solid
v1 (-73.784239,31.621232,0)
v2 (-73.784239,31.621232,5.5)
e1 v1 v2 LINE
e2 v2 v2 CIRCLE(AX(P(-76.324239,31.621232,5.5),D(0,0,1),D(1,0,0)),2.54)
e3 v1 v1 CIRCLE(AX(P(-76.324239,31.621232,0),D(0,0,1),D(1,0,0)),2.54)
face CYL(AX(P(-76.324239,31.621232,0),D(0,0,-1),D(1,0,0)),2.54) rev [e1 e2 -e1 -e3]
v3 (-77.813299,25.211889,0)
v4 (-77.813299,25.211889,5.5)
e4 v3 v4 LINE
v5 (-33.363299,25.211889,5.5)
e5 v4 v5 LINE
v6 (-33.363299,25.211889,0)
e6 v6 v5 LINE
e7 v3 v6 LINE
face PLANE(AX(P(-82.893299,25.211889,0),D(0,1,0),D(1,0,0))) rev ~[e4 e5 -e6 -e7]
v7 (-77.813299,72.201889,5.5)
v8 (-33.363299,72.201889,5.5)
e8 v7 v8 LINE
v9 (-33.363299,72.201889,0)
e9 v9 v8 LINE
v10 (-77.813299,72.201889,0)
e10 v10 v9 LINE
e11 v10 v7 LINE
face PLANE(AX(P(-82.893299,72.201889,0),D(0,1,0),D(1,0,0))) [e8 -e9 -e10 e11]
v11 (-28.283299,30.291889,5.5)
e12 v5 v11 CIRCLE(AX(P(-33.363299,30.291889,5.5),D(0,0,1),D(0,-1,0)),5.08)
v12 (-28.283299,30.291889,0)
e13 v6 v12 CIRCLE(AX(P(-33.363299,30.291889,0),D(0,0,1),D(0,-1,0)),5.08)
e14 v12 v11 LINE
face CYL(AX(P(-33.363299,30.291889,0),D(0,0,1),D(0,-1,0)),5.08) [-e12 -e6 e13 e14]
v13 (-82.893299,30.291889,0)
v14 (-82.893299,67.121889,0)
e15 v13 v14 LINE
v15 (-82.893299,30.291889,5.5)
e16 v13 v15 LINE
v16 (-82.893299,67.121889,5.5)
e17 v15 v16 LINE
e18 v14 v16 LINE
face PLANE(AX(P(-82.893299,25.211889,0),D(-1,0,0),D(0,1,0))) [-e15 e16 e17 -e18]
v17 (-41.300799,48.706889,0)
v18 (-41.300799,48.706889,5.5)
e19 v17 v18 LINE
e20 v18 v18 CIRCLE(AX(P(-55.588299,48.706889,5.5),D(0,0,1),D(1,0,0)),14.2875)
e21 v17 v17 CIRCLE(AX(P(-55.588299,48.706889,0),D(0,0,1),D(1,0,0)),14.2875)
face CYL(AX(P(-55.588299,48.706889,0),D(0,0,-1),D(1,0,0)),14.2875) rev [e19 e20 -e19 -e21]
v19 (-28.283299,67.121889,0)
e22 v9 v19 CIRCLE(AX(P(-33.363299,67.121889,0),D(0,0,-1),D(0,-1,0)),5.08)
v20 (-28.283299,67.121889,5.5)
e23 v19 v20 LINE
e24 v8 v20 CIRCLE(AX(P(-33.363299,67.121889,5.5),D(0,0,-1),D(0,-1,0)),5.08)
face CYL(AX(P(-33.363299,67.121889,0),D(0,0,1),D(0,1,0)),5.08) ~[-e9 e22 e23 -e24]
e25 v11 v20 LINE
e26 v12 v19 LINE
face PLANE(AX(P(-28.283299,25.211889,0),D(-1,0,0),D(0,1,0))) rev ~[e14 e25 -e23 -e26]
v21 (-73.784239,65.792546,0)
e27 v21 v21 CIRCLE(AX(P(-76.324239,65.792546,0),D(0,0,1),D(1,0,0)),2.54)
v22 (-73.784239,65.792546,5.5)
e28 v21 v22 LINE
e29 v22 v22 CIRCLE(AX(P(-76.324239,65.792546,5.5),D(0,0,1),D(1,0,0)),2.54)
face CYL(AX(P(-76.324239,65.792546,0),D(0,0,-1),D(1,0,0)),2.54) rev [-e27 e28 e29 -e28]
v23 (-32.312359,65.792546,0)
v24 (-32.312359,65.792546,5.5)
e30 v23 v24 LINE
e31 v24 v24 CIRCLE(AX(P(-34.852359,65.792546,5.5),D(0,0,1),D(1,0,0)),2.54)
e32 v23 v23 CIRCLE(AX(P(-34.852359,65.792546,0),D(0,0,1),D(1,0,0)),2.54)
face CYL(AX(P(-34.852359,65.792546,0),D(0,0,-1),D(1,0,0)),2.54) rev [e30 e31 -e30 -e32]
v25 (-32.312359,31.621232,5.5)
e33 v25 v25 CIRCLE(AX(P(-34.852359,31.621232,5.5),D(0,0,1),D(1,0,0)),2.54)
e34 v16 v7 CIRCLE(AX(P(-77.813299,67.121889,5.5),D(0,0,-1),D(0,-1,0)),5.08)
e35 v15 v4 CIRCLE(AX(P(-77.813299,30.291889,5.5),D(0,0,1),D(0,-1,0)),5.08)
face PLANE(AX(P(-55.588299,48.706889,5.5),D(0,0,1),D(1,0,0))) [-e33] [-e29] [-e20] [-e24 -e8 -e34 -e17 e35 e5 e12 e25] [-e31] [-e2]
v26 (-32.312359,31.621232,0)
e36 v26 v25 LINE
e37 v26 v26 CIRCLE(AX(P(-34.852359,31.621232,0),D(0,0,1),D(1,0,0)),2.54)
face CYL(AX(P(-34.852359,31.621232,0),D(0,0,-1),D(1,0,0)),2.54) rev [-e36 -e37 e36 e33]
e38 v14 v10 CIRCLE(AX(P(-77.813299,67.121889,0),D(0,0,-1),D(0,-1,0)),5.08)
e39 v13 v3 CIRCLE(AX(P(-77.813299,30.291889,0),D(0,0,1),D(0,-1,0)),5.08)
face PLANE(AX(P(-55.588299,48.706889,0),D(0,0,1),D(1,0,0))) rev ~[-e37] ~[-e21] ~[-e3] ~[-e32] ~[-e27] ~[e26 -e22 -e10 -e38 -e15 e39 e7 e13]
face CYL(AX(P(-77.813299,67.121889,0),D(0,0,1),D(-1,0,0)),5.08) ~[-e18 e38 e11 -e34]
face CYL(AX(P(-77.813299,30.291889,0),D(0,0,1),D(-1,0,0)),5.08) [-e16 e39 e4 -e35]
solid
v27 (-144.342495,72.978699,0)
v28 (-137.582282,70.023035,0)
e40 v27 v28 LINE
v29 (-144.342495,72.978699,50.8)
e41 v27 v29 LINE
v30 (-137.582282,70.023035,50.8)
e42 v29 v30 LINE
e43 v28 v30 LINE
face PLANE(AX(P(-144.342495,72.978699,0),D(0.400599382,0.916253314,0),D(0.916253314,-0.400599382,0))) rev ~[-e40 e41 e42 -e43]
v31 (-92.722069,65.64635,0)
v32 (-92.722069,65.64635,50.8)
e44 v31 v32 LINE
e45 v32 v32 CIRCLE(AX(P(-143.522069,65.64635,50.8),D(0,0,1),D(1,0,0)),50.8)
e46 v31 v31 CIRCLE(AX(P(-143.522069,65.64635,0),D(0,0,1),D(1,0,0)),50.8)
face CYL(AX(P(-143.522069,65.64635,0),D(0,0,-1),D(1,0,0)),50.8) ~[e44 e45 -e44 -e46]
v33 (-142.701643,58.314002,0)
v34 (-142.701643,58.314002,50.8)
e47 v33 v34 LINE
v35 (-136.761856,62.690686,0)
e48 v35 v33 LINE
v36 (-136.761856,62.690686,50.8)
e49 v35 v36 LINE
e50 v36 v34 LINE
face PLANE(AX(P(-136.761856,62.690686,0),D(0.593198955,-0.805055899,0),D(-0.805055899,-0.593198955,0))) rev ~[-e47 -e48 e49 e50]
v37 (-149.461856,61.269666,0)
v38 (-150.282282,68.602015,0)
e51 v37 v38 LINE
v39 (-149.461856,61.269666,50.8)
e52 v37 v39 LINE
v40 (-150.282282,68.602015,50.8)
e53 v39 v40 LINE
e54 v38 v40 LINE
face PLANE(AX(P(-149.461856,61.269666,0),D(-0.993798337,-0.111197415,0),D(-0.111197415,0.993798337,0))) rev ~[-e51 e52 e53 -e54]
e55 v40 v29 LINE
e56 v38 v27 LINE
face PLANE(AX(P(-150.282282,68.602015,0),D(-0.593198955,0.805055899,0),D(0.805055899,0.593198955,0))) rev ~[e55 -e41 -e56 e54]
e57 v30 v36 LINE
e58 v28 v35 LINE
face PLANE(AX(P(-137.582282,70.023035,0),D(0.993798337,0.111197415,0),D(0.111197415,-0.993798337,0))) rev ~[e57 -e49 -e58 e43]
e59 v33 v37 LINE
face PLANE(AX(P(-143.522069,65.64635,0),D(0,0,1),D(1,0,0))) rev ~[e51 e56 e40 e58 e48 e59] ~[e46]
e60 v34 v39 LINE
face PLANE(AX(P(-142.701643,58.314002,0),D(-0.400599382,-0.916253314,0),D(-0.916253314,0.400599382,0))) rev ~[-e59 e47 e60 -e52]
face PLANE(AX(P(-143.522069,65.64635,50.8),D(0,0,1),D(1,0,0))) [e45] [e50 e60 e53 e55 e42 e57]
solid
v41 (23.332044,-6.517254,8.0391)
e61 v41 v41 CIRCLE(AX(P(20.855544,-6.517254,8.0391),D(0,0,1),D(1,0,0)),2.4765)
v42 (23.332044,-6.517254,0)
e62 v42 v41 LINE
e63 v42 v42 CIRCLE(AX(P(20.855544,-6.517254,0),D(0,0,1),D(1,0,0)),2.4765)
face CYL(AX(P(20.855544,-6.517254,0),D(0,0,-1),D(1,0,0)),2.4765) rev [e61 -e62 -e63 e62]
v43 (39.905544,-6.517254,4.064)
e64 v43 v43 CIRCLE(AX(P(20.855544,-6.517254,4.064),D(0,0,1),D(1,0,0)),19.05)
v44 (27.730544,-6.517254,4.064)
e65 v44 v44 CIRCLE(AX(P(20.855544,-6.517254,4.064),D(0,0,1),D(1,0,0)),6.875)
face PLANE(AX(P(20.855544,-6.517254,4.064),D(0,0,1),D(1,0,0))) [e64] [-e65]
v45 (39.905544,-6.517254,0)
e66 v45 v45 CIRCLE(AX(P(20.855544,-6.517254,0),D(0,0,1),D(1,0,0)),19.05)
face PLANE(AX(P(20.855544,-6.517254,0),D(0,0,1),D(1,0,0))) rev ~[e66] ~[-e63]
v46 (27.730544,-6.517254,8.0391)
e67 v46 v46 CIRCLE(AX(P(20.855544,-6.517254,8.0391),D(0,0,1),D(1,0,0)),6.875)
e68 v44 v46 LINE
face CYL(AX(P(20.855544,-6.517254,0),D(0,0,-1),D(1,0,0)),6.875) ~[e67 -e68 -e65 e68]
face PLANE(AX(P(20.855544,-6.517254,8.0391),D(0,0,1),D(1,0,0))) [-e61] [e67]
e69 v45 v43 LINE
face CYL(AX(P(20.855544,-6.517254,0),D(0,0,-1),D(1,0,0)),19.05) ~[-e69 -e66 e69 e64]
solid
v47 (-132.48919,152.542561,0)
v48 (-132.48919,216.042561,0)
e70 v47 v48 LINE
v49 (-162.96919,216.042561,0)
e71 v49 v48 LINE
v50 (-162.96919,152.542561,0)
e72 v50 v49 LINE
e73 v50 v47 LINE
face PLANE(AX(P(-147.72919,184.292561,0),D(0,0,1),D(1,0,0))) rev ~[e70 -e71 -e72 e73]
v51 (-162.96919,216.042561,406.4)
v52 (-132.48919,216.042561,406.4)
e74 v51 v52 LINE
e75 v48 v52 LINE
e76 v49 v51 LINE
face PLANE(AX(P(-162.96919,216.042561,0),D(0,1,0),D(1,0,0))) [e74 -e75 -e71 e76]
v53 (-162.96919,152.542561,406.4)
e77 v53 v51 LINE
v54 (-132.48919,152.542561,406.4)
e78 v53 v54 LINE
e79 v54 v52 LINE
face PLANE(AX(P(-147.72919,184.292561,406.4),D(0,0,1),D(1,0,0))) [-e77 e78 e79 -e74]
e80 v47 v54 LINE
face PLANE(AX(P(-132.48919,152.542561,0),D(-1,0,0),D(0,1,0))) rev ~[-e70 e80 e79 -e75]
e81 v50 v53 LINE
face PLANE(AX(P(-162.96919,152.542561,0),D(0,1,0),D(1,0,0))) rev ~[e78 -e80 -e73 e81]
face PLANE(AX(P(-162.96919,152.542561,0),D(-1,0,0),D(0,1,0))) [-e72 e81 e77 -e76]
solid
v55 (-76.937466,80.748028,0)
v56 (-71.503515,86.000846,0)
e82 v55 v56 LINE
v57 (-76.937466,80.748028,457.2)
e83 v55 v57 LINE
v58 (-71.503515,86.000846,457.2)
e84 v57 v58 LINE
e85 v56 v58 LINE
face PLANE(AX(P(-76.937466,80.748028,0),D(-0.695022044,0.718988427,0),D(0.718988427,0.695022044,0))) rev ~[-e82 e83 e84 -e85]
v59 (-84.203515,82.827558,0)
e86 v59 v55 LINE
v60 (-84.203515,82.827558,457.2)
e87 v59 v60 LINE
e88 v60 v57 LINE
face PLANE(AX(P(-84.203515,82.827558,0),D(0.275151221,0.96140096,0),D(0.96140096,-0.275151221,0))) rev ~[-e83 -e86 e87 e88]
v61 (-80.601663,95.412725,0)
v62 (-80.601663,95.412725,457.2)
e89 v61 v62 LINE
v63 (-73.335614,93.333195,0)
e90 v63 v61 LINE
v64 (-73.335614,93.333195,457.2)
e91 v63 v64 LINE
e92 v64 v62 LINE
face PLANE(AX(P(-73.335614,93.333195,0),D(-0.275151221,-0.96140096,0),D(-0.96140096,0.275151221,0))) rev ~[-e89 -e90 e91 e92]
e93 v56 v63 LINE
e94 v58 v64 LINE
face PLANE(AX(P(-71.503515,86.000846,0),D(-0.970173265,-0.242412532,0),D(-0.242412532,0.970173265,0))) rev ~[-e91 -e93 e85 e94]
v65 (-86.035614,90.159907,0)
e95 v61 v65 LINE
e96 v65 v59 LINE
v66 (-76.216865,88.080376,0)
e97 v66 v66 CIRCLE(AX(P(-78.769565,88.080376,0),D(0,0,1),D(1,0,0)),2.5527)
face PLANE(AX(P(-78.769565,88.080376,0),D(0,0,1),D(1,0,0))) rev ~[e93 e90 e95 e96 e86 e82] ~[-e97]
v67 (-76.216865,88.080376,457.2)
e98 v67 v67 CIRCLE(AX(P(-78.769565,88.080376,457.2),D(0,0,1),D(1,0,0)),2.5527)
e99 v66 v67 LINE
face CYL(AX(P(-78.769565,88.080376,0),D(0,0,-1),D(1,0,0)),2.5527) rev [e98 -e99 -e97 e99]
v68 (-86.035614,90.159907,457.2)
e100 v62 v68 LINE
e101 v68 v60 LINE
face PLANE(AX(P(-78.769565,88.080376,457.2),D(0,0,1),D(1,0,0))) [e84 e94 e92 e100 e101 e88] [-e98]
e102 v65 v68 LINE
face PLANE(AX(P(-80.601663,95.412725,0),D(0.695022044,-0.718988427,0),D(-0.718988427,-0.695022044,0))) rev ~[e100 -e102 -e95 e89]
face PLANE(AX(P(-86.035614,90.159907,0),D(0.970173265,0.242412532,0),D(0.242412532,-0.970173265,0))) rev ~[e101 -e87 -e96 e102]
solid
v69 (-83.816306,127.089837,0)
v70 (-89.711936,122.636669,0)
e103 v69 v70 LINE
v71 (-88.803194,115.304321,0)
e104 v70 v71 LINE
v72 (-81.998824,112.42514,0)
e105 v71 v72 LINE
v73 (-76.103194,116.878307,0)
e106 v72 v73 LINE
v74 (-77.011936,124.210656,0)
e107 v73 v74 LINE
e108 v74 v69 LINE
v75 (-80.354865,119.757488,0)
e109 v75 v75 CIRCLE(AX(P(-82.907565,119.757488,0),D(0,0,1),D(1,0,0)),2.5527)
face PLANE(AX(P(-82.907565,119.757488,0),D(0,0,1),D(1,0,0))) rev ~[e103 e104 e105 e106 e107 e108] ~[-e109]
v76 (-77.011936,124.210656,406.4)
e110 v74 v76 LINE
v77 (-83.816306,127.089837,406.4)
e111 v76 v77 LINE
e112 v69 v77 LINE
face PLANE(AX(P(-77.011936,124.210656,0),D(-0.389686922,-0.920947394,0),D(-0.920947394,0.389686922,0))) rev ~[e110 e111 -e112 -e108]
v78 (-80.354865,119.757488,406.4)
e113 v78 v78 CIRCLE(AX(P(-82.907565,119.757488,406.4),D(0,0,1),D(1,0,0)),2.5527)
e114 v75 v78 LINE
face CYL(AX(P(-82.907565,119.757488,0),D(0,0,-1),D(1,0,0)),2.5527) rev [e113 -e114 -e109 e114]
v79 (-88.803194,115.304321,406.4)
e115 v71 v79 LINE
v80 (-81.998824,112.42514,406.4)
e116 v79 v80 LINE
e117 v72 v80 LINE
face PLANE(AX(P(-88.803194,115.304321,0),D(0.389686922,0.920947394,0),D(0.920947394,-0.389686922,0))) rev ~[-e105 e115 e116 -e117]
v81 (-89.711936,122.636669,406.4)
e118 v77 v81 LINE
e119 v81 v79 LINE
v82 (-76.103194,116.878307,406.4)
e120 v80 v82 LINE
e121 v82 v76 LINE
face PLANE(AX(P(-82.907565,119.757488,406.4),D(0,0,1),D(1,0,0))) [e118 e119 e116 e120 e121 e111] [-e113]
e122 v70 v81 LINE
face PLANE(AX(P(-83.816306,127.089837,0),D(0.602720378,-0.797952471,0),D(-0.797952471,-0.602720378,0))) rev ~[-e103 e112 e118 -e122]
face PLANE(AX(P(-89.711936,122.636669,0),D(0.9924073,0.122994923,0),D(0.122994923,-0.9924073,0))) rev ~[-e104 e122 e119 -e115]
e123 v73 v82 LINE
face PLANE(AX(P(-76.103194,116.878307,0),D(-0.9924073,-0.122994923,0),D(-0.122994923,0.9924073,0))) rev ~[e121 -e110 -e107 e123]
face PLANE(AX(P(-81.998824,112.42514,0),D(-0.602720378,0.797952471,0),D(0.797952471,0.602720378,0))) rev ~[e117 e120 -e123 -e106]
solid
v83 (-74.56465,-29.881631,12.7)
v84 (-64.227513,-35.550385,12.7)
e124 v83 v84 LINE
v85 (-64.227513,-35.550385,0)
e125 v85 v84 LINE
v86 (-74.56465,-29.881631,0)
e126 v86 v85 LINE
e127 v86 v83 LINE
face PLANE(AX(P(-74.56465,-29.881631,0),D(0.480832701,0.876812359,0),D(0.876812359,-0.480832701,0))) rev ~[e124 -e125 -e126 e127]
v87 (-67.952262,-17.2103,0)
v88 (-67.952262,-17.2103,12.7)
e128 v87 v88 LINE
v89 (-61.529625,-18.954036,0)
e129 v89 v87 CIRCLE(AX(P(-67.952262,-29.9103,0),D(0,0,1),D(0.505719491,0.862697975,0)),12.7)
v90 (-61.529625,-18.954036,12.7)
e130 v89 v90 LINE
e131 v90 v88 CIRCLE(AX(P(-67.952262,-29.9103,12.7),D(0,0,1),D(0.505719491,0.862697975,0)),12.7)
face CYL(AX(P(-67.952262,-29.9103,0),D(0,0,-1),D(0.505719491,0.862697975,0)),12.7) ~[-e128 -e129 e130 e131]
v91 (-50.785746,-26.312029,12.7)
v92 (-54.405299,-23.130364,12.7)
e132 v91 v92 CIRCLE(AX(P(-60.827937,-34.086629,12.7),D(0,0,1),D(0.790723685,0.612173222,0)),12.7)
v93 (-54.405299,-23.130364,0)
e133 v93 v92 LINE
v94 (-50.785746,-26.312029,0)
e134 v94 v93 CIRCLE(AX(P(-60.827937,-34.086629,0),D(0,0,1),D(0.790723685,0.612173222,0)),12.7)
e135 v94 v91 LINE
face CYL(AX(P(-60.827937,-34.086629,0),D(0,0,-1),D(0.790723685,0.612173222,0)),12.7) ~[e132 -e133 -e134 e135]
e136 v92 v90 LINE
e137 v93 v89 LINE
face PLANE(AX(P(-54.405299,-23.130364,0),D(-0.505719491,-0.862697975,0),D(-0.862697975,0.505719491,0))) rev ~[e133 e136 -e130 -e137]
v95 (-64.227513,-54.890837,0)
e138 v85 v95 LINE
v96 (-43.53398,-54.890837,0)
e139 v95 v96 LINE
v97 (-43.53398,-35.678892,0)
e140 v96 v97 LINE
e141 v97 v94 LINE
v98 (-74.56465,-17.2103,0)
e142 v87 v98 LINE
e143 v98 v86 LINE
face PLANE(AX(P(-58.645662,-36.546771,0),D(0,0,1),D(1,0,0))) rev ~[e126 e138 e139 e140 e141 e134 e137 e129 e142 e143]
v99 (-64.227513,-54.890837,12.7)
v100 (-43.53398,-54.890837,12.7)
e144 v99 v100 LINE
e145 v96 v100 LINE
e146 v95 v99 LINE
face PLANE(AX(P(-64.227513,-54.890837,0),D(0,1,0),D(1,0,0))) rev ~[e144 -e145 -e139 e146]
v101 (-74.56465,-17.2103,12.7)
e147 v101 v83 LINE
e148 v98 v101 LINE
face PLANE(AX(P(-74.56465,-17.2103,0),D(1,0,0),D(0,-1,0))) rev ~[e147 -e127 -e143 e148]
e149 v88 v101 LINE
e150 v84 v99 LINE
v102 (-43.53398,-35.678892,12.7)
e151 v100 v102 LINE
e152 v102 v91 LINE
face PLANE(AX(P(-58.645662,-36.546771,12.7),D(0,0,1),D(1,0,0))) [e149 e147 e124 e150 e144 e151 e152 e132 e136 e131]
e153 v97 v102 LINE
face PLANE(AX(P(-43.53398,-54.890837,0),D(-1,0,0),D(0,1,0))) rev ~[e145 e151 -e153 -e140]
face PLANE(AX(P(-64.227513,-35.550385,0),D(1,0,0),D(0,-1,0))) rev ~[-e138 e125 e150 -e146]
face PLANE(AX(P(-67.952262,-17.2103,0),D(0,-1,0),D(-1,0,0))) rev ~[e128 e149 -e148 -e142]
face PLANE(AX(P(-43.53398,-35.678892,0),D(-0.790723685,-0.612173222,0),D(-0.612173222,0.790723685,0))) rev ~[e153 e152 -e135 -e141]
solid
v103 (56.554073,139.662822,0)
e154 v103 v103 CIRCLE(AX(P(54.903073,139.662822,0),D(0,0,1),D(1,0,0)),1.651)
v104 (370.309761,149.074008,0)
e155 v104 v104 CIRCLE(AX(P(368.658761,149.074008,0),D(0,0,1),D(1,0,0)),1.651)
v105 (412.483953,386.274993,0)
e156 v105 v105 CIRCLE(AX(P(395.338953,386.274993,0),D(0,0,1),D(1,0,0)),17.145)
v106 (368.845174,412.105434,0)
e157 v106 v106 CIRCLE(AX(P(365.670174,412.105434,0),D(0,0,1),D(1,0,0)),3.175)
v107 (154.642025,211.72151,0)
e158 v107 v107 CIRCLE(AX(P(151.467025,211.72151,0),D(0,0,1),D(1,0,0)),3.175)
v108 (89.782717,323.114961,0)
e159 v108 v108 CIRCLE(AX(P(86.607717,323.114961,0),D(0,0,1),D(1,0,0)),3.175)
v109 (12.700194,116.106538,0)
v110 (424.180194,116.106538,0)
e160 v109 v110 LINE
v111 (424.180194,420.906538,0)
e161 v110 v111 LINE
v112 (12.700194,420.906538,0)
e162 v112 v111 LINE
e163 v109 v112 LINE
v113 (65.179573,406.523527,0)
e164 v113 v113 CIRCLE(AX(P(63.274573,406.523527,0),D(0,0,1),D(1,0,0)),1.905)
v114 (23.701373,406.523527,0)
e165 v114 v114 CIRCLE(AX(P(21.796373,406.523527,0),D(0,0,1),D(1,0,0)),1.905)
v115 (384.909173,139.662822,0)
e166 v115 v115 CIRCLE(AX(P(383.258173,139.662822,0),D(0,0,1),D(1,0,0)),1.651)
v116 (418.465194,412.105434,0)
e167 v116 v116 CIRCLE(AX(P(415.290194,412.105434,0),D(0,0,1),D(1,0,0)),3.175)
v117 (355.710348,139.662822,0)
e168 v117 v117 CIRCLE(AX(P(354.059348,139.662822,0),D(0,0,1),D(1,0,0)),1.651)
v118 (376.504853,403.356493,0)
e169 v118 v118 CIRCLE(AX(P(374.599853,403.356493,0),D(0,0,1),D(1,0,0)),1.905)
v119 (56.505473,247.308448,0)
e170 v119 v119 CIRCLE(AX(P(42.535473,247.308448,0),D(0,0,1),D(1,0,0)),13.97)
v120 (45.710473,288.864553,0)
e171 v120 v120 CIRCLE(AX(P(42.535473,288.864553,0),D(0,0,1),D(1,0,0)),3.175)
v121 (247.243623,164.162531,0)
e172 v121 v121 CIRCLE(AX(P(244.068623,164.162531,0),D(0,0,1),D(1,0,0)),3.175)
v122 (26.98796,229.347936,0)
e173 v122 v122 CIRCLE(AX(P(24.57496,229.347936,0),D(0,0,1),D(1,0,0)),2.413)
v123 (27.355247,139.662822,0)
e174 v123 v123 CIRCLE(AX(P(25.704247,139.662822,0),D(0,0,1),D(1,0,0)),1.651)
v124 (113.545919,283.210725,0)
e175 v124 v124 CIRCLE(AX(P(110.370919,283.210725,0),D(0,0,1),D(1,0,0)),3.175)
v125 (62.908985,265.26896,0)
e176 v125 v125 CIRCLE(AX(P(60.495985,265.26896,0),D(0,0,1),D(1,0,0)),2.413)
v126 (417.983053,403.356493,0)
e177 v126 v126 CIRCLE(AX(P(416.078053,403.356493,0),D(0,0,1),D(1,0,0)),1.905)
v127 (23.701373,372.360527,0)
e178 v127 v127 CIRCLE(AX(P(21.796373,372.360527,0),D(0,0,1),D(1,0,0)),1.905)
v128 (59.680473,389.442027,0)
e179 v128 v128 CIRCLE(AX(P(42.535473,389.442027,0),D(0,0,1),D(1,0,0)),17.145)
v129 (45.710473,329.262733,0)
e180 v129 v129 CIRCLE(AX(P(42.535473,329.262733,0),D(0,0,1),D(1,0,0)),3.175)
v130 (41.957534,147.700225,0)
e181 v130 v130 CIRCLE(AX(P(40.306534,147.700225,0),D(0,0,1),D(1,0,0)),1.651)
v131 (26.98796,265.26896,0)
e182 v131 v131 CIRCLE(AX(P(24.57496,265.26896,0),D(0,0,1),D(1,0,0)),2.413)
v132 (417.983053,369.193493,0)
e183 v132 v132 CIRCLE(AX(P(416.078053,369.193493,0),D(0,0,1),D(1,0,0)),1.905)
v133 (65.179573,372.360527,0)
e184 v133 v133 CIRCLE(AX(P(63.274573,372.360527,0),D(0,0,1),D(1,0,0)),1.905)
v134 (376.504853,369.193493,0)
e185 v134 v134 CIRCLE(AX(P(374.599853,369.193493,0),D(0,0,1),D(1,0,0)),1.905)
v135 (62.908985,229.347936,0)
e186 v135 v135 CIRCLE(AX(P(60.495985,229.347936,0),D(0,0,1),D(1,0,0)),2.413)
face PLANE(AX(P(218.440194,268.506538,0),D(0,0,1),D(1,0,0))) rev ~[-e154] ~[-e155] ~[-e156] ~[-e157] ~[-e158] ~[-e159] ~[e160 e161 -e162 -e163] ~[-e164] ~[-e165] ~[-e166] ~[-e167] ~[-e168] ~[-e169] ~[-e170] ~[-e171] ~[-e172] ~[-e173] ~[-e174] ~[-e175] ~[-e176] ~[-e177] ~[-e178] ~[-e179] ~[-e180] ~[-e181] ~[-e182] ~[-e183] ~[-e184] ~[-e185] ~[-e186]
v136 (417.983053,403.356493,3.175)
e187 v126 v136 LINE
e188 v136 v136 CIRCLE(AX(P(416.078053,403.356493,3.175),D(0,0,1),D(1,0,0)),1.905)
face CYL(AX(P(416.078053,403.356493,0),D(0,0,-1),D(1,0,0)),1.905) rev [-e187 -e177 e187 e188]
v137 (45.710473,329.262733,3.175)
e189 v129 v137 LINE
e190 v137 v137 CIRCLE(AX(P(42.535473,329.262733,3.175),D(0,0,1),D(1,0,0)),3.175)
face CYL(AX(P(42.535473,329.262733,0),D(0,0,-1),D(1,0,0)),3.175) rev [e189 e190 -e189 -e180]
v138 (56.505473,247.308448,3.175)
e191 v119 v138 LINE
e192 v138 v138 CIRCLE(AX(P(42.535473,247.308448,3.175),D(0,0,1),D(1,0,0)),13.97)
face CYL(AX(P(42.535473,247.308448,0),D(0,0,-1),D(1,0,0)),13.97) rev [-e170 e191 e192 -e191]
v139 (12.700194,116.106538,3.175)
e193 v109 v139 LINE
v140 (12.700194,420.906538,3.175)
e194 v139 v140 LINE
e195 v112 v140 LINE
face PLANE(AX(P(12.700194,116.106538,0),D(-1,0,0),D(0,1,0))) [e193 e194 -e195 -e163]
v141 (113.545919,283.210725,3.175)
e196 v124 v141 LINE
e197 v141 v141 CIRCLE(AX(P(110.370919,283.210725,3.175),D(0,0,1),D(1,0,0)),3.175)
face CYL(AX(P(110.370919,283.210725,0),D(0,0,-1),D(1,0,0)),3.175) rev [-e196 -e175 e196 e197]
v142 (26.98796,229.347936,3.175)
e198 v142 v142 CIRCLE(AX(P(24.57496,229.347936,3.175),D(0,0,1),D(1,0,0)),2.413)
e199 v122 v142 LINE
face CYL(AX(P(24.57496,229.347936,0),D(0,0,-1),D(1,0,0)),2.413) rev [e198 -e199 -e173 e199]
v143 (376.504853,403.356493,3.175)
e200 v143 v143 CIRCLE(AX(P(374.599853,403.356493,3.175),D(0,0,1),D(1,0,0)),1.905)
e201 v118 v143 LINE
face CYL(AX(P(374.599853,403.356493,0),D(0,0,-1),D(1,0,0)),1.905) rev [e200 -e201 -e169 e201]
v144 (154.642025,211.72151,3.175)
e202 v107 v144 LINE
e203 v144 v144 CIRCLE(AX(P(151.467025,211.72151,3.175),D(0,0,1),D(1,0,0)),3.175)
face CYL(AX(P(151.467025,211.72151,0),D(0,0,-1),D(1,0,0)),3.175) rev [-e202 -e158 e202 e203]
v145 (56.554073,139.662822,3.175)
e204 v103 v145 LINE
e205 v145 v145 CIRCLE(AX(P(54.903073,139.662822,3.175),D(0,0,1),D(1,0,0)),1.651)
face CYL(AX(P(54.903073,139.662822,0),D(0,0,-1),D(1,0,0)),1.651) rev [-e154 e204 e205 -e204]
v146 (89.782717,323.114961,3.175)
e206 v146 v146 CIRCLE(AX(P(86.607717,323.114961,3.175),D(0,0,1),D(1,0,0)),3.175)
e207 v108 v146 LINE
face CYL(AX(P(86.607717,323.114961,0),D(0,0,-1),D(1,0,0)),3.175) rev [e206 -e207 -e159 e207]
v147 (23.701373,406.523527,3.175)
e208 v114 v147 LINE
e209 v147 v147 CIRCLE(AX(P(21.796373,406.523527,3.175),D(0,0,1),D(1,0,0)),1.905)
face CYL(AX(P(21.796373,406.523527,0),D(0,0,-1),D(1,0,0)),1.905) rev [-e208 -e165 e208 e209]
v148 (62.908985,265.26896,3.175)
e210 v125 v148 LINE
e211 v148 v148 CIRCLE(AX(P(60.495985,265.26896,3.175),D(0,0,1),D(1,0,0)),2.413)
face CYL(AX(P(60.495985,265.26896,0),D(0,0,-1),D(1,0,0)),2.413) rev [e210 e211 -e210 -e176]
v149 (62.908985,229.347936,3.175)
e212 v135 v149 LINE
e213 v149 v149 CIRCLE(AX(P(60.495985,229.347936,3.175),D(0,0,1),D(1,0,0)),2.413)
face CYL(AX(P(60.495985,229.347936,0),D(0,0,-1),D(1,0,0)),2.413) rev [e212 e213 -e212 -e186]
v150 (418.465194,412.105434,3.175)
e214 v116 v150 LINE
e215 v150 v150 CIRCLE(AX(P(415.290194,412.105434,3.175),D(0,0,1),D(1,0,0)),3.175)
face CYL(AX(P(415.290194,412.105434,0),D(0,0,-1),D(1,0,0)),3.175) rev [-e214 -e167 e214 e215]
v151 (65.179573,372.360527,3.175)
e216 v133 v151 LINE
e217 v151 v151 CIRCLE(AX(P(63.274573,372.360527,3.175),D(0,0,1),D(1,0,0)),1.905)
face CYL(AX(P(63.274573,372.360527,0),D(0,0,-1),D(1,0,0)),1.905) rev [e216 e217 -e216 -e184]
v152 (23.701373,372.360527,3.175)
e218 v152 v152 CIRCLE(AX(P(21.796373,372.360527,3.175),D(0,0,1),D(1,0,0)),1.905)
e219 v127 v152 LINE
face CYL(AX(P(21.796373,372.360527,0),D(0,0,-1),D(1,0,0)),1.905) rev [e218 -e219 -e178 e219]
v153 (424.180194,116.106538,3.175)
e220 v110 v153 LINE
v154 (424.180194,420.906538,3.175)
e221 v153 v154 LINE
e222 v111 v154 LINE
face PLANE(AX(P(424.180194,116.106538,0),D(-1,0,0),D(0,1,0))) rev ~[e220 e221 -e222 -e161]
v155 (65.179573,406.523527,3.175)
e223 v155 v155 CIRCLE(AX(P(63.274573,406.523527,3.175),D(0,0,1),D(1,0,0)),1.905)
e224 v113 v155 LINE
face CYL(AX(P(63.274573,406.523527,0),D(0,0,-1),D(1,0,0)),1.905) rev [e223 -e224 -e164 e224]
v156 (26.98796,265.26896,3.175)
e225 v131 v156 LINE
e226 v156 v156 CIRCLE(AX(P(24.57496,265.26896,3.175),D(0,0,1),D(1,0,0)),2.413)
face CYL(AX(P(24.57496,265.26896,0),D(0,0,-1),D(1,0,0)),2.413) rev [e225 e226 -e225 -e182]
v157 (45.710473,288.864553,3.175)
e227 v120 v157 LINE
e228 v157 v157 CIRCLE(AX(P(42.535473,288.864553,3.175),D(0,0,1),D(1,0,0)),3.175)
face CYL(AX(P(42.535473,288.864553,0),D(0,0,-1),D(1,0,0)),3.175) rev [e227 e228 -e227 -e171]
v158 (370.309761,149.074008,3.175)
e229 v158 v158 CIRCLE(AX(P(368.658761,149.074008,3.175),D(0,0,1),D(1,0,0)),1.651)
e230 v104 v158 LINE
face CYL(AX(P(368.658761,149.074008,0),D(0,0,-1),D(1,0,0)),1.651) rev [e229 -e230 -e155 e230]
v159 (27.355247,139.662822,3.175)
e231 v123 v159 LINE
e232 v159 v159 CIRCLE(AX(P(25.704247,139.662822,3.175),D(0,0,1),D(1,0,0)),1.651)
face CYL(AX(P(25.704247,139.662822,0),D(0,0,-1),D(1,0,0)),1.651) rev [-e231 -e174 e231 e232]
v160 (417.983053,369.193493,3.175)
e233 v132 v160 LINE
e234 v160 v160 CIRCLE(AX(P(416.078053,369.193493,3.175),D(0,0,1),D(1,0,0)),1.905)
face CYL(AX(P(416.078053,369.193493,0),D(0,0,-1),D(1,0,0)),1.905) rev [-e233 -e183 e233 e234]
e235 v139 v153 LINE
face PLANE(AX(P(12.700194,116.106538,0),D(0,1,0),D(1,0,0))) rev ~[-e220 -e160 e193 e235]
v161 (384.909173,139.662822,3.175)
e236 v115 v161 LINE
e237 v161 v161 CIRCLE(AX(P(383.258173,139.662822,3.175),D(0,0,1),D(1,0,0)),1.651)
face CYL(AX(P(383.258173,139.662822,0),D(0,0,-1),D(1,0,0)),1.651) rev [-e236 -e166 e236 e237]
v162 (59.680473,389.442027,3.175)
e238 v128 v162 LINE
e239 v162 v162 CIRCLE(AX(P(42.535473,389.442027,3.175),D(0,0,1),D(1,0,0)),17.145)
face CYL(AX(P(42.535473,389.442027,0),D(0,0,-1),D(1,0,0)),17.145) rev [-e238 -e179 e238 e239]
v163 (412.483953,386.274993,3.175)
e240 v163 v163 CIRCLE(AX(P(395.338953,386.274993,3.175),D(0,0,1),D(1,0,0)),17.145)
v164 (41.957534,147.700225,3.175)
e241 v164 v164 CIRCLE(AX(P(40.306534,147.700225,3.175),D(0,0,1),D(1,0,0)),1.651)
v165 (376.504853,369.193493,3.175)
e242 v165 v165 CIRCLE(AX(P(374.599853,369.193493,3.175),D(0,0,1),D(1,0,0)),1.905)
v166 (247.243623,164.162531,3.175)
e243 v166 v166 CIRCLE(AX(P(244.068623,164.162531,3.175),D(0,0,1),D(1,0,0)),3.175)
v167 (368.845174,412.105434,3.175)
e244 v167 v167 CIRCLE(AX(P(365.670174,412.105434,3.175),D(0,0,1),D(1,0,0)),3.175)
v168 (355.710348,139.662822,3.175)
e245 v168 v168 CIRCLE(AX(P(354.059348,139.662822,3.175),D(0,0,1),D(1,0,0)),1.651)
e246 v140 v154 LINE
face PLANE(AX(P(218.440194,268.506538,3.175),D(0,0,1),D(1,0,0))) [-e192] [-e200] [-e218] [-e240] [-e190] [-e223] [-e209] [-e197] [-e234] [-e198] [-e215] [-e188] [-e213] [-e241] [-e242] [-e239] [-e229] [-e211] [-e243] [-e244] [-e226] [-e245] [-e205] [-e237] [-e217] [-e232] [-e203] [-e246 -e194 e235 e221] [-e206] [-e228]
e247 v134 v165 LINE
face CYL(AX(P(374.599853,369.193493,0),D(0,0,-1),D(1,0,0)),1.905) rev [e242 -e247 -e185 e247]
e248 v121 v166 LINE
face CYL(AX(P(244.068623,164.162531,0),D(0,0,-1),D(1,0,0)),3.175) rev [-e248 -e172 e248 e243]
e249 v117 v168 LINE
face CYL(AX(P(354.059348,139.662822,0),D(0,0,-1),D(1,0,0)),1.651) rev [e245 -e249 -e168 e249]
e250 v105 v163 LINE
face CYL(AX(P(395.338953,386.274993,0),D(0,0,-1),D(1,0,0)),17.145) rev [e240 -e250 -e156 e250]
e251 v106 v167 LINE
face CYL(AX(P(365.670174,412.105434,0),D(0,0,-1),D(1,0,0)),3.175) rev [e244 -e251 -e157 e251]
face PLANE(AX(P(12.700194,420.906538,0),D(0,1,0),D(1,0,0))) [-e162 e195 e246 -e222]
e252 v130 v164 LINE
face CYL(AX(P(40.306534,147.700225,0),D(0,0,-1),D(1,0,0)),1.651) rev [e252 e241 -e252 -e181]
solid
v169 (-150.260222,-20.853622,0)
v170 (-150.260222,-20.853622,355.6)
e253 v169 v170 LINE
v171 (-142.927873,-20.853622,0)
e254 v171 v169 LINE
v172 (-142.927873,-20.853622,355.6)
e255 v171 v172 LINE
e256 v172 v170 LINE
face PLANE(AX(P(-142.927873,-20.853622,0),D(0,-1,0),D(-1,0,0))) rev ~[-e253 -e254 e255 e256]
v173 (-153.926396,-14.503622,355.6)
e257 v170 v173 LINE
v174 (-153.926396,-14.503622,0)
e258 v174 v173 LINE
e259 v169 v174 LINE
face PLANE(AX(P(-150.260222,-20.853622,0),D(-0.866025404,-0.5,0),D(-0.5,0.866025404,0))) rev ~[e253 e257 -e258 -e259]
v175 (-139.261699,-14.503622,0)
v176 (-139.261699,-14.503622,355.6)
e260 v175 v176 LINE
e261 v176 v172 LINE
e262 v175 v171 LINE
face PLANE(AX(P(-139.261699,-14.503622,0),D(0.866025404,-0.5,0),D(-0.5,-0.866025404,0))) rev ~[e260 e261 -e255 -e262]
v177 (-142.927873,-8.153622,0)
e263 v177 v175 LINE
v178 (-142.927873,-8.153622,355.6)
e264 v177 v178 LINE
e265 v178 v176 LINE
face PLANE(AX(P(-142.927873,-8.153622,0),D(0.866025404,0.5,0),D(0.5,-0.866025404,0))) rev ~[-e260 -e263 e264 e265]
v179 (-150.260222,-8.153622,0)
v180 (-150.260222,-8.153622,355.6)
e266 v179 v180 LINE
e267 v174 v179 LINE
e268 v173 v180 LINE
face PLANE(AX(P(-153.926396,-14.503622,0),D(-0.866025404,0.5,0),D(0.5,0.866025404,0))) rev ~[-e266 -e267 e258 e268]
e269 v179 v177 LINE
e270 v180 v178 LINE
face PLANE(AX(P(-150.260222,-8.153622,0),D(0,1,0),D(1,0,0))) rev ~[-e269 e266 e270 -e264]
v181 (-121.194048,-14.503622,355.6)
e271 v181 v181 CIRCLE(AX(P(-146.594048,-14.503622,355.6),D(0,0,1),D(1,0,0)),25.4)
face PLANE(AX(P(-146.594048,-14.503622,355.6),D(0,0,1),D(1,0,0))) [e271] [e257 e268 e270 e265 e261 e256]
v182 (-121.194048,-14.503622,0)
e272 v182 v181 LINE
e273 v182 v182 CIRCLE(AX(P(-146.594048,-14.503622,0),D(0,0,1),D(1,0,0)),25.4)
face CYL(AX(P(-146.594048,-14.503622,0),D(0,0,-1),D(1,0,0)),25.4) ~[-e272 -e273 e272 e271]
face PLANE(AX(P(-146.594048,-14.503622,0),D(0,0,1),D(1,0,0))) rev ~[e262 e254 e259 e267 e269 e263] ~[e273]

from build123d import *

# Parameters (mm, degrees)
F1_R      = 50.8
F2_DEPTH  = 50.8
F1_R_2    = 2.5527
F3_DEPTH  = 457.2
F4_DEPTH  = 406.4
F5_W      = 30.48
F5_H      = 63.5
F6_DEPTH  = 406.4
F5_W_2    = 411.48
F5_H_2    = 304.8
F5_R      = 1.651
F5_R_2    = 2.413
F5_R_3    = 13.97
F5_R_4    = 3.175
F5_R_5    = 1.905
F5_R_6    = 17.145
F7_DEPTH  = 3.175
F8_W      = 54.61
F8_H      = 46.99
F8_R      = 2.54
F8_R_2    = 14.2875
F9_DEPTH  = 5.5
F10_R     = 5.08
F1_R_3    = 25.4
F11_DEPTH = 355.6
F13_DEPTH = 12.7
F14_R     = 19.05
F14_R_2   = 6.875
F15_DEPTH = 4.064
F14_R_3   = 2.4765
F16_DEPTH = 8.0391


# Not quite as in the source:
# - a length typed as a fraction of an inch, garbled in the dataset ("3 / 203.2 mm" for 3/8 in), is restored


with BuildPart() as f2:
    # F1 (on Top) → F2 (new body)
    with BuildSketch(Plane.XY):
        with Locations((-143.5220688581, 65.6463503838)):
            Circle(F1_R)
        Polygon((-137.5822819568, 70.0230345219), (-136.7618557595, 62.6906861032), (-142.7016426608, 58.3140019651), (-149.4618557595, 61.2696662456), (-150.2822819568, 68.6020146643), (-144.3424950555, 72.9786988025), align=None, mode=Mode.SUBTRACT)
    extrude(amount=F2_DEPTH)


with BuildPart() as f3:
    # F1 (on Top) → F3 (new body)
    with BuildSketch(Plane.XY):
        Polygon((-76.9374659596, 80.7480279679), (-71.5035152941, 86.0008461668), (-73.3356139631, 93.3331945856), (-80.6016632976, 95.4127248054), (-86.0356139631, 90.1599066064), (-84.2035152941, 82.8275581877), align=None)
        with Locations((-78.7695646286, 88.0803763866)):
            Circle(F1_R_2, mode=Mode.SUBTRACT)
    extrude(amount=F3_DEPTH)


with BuildPart() as f4:
    # F1 (on Top) → F4 (new body)
    with BuildSketch(Plane.XY):
        Polygon((-76.1031942211, 116.8783073278), (-77.011935655, 124.2106557465), (-83.816306372, 127.0898367887), (-89.711935655, 122.636669412), (-88.8031942211, 115.3043209933), (-81.9988235041, 112.4251399512), align=None)
        with Locations((-82.9075649381, 119.7574883699)):
            Circle(F1_R_2, mode=Mode.SUBTRACT)
    extrude(amount=F4_DEPTH)


with BuildPart() as f6:
    # F5 (on Top) → F6 (new body)
    with BuildSketch(Plane.XY):
        with Locations((-147.7291895056, 184.2925612926)):
            Rectangle(F5_W, F5_H)
    extrude(amount=F6_DEPTH)


with BuildPart() as f7:
    # F5 (on Top) → F7 (new body)
    with BuildSketch(Plane.XY):
        with Locations((218.4401935768, 268.5065377951)):
            Rectangle(F5_W_2, F5_H_2)
        with Locations((25.7042471561, 139.6628220876)):
            Circle(F5_R, mode=Mode.SUBTRACT)
        with Locations((54.9030725154, 139.6628220876)):
            Circle(F5_R, mode=Mode.SUBTRACT)
        with Locations((40.3065336868, 147.7002253135)):
            Circle(F5_R, mode=Mode.SUBTRACT)
        with Locations((24.5749604191, 229.3479357149)):
            Circle(F5_R_2, mode=Mode.SUBTRACT)
        with Locations((60.4959849034, 229.3479357149)):
            Circle(F5_R_2, mode=Mode.SUBTRACT)
        with Locations((42.5354726613, 247.308447957)):
            Circle(F5_R_3, mode=Mode.SUBTRACT)
        with Locations((24.5749604191, 265.2689601992)):
            Circle(F5_R_2, mode=Mode.SUBTRACT)
        with Locations((60.4959849034, 265.2689601992)):
            Circle(F5_R_2, mode=Mode.SUBTRACT)
        with Locations((244.0686225891, 164.1625314951)):
            Circle(F5_R_4, mode=Mode.SUBTRACT)
        with Locations((354.0593478829, 139.6628220876)):
            Circle(F5_R, mode=Mode.SUBTRACT)
        with Locations((383.2581732422, 139.6628220876)):
            Circle(F5_R, mode=Mode.SUBTRACT)
        with Locations((368.6587605625, 149.0740080674)):
            Circle(F5_R, mode=Mode.SUBTRACT)
        with Locations((151.46702528, 211.7215096951)):
            Circle(F5_R_4, mode=Mode.SUBTRACT)
        with Locations((42.5354726613, 288.8645529747)):
            Circle(F5_R_4, mode=Mode.SUBTRACT)
        with Locations((110.3709191084, 283.2107245922)):
            Circle(F5_R_4, mode=Mode.SUBTRACT)
        with Locations((42.5354726613, 329.2627334595)):
            Circle(F5_R_4, mode=Mode.SUBTRACT)
        with Locations((86.6077169776, 323.1149613857)):
            Circle(F5_R_4, mode=Mode.SUBTRACT)
        with Locations((21.7963726613, 372.3605266151)):
            Circle(F5_R_5, mode=Mode.SUBTRACT)
        with Locations((63.2745726613, 372.3605266151)):
            Circle(F5_R_5, mode=Mode.SUBTRACT)
        with Locations((42.5354726613, 389.4420266151)):
            Circle(F5_R_6, mode=Mode.SUBTRACT)
        with Locations((21.7963726613, 406.5235266151)):
            Circle(F5_R_5, mode=Mode.SUBTRACT)
        with Locations((63.2745726613, 406.5235266151)):
            Circle(F5_R_5, mode=Mode.SUBTRACT)
        with Locations((374.5998525414, 369.1934934196)):
            Circle(F5_R_5, mode=Mode.SUBTRACT)
        with Locations((416.0780525414, 369.1934934196)):
            Circle(F5_R_5, mode=Mode.SUBTRACT)
        with Locations((395.3389525414, 386.2749934196)):
            Circle(F5_R_6, mode=Mode.SUBTRACT)
        with Locations((374.5998525414, 403.3564934196)):
            Circle(F5_R_5, mode=Mode.SUBTRACT)
        with Locations((365.6701743603, 412.1054336176)):
            Circle(F5_R_4, mode=Mode.SUBTRACT)
        with Locations((416.0780525414, 403.3564934196)):
            Circle(F5_R_5, mode=Mode.SUBTRACT)
        with Locations((415.2901935768, 412.1054336176)):
            Circle(F5_R_4, mode=Mode.SUBTRACT)
    extrude(amount=F7_DEPTH)


with BuildPart() as f9:
    # F8 (on Top) → F9 (new body)
    with BuildSketch(Plane.XY):
        with Locations((-55.5882994086, 48.7068889356)):
            Rectangle(F8_W, F8_H)
        with Locations((-76.3242393732, 31.6212321949)):
            Circle(F8_R, mode=Mode.SUBTRACT)
        with Locations((-34.8523594439, 31.6212321949)):
            Circle(F8_R, mode=Mode.SUBTRACT)
        with Locations((-76.3242393732, 65.7925456762)):
            Circle(F8_R, mode=Mode.SUBTRACT)
        with Locations((-55.5882994086, 48.7068889356)):
            Circle(F8_R_2, mode=Mode.SUBTRACT)
        with Locations((-34.8523594439, 65.7925456762)):
            Circle(F8_R, mode=Mode.SUBTRACT)
    extrude(amount=F9_DEPTH)

    # F10
    f10_edges = [f9.edges().sort_by_distance(p)[0] for p in [
        (-28.283299, 25.211889, 2.75),
        (-82.893299, 25.211889, 2.75),
        (-28.283299, 72.201889, 2.75),
        (-82.893299, 72.201889, 2.75),
    ]]
    fillet(f10_edges, radius=F10_R)


with BuildPart() as f11:
    # F1 (on Top) → F11 (new body)
    with BuildSketch(Plane.XY):
        with Locations((-146.5940475464, -14.5036224276)):
            Circle(F1_R_3)
        Polygon((-139.2616991277, -14.5036224276), (-142.927873337, -20.8536224276), (-150.2602217557, -20.8536224276), (-153.9263959651, -14.5036224276), (-150.2602217557, -8.1536224276), (-142.927873337, -8.1536224276), align=None, mode=Mode.SUBTRACT)
    extrude(amount=F11_DEPTH)


with BuildPart() as f13:
    # F12 (on Top) → F13 (new body)
    with BuildSketch(Plane.XY):
        with BuildLine():
            Line((-74.5646499772, -29.8816310388), (-64.2275132914, -35.5503847969))
            Line((-64.2275132914, -35.5503847969), (-64.2275132914, -54.8908366037))
            Line((-64.2275132914, -54.8908366037), (-43.5339800427, -54.8908366037))
            Line((-43.5339800427, -54.8908366037), (-43.5339800427, -35.6788924437))
            Line((-43.5339800427, -35.6788924437), (-50.785745993, -26.3120287944))
            ThreePointArc((-50.785745993, -26.3120287944), (-52.4432251073, -24.5479385551), (-54.4052992591, -23.1303644266))
            Line((-54.4052992591, -23.1303644266), (-61.5296247054, -18.9540358114))
            ThreePointArc((-61.5296247054, -18.9540358114), (-64.6246922895, -17.6539842457), (-67.9522622434, -17.2103000951))
            Line((-67.9522622434, -17.2103000951), (-74.5646499772, -17.2103000951))
            Line((-74.5646499772, -17.2103000951), (-74.5646499772, -29.8816310388))
        make_face()
    extrude(amount=F13_DEPTH)


with BuildPart() as f15:
    # F14 (on Top) → F15 (new body)
    with BuildSketch(Plane.XY):
        with Locations((20.855544135, -6.5172538161)):
            Circle(F14_R)
        with Locations((20.855544135, -6.5172538161)):
            Circle(F14_R_2, mode=Mode.SUBTRACT)
    extrude(amount=F15_DEPTH)

    # F14 (on Top) → F16 (join)
    with BuildSketch(Plane.XY):
        with Locations((20.855544135, -6.5172538161)):
            Circle(F14_R_2)
        with Locations((20.855544135, -6.5172538161)):
            Circle(F14_R_3, mode=Mode.SUBTRACT)
    extrude(amount=F16_DEPTH)


solid = Compound([f2.part, f3.part, f4.part, f6.part, f7.part, f9.part, f11.part, f13.part, f15.part])
